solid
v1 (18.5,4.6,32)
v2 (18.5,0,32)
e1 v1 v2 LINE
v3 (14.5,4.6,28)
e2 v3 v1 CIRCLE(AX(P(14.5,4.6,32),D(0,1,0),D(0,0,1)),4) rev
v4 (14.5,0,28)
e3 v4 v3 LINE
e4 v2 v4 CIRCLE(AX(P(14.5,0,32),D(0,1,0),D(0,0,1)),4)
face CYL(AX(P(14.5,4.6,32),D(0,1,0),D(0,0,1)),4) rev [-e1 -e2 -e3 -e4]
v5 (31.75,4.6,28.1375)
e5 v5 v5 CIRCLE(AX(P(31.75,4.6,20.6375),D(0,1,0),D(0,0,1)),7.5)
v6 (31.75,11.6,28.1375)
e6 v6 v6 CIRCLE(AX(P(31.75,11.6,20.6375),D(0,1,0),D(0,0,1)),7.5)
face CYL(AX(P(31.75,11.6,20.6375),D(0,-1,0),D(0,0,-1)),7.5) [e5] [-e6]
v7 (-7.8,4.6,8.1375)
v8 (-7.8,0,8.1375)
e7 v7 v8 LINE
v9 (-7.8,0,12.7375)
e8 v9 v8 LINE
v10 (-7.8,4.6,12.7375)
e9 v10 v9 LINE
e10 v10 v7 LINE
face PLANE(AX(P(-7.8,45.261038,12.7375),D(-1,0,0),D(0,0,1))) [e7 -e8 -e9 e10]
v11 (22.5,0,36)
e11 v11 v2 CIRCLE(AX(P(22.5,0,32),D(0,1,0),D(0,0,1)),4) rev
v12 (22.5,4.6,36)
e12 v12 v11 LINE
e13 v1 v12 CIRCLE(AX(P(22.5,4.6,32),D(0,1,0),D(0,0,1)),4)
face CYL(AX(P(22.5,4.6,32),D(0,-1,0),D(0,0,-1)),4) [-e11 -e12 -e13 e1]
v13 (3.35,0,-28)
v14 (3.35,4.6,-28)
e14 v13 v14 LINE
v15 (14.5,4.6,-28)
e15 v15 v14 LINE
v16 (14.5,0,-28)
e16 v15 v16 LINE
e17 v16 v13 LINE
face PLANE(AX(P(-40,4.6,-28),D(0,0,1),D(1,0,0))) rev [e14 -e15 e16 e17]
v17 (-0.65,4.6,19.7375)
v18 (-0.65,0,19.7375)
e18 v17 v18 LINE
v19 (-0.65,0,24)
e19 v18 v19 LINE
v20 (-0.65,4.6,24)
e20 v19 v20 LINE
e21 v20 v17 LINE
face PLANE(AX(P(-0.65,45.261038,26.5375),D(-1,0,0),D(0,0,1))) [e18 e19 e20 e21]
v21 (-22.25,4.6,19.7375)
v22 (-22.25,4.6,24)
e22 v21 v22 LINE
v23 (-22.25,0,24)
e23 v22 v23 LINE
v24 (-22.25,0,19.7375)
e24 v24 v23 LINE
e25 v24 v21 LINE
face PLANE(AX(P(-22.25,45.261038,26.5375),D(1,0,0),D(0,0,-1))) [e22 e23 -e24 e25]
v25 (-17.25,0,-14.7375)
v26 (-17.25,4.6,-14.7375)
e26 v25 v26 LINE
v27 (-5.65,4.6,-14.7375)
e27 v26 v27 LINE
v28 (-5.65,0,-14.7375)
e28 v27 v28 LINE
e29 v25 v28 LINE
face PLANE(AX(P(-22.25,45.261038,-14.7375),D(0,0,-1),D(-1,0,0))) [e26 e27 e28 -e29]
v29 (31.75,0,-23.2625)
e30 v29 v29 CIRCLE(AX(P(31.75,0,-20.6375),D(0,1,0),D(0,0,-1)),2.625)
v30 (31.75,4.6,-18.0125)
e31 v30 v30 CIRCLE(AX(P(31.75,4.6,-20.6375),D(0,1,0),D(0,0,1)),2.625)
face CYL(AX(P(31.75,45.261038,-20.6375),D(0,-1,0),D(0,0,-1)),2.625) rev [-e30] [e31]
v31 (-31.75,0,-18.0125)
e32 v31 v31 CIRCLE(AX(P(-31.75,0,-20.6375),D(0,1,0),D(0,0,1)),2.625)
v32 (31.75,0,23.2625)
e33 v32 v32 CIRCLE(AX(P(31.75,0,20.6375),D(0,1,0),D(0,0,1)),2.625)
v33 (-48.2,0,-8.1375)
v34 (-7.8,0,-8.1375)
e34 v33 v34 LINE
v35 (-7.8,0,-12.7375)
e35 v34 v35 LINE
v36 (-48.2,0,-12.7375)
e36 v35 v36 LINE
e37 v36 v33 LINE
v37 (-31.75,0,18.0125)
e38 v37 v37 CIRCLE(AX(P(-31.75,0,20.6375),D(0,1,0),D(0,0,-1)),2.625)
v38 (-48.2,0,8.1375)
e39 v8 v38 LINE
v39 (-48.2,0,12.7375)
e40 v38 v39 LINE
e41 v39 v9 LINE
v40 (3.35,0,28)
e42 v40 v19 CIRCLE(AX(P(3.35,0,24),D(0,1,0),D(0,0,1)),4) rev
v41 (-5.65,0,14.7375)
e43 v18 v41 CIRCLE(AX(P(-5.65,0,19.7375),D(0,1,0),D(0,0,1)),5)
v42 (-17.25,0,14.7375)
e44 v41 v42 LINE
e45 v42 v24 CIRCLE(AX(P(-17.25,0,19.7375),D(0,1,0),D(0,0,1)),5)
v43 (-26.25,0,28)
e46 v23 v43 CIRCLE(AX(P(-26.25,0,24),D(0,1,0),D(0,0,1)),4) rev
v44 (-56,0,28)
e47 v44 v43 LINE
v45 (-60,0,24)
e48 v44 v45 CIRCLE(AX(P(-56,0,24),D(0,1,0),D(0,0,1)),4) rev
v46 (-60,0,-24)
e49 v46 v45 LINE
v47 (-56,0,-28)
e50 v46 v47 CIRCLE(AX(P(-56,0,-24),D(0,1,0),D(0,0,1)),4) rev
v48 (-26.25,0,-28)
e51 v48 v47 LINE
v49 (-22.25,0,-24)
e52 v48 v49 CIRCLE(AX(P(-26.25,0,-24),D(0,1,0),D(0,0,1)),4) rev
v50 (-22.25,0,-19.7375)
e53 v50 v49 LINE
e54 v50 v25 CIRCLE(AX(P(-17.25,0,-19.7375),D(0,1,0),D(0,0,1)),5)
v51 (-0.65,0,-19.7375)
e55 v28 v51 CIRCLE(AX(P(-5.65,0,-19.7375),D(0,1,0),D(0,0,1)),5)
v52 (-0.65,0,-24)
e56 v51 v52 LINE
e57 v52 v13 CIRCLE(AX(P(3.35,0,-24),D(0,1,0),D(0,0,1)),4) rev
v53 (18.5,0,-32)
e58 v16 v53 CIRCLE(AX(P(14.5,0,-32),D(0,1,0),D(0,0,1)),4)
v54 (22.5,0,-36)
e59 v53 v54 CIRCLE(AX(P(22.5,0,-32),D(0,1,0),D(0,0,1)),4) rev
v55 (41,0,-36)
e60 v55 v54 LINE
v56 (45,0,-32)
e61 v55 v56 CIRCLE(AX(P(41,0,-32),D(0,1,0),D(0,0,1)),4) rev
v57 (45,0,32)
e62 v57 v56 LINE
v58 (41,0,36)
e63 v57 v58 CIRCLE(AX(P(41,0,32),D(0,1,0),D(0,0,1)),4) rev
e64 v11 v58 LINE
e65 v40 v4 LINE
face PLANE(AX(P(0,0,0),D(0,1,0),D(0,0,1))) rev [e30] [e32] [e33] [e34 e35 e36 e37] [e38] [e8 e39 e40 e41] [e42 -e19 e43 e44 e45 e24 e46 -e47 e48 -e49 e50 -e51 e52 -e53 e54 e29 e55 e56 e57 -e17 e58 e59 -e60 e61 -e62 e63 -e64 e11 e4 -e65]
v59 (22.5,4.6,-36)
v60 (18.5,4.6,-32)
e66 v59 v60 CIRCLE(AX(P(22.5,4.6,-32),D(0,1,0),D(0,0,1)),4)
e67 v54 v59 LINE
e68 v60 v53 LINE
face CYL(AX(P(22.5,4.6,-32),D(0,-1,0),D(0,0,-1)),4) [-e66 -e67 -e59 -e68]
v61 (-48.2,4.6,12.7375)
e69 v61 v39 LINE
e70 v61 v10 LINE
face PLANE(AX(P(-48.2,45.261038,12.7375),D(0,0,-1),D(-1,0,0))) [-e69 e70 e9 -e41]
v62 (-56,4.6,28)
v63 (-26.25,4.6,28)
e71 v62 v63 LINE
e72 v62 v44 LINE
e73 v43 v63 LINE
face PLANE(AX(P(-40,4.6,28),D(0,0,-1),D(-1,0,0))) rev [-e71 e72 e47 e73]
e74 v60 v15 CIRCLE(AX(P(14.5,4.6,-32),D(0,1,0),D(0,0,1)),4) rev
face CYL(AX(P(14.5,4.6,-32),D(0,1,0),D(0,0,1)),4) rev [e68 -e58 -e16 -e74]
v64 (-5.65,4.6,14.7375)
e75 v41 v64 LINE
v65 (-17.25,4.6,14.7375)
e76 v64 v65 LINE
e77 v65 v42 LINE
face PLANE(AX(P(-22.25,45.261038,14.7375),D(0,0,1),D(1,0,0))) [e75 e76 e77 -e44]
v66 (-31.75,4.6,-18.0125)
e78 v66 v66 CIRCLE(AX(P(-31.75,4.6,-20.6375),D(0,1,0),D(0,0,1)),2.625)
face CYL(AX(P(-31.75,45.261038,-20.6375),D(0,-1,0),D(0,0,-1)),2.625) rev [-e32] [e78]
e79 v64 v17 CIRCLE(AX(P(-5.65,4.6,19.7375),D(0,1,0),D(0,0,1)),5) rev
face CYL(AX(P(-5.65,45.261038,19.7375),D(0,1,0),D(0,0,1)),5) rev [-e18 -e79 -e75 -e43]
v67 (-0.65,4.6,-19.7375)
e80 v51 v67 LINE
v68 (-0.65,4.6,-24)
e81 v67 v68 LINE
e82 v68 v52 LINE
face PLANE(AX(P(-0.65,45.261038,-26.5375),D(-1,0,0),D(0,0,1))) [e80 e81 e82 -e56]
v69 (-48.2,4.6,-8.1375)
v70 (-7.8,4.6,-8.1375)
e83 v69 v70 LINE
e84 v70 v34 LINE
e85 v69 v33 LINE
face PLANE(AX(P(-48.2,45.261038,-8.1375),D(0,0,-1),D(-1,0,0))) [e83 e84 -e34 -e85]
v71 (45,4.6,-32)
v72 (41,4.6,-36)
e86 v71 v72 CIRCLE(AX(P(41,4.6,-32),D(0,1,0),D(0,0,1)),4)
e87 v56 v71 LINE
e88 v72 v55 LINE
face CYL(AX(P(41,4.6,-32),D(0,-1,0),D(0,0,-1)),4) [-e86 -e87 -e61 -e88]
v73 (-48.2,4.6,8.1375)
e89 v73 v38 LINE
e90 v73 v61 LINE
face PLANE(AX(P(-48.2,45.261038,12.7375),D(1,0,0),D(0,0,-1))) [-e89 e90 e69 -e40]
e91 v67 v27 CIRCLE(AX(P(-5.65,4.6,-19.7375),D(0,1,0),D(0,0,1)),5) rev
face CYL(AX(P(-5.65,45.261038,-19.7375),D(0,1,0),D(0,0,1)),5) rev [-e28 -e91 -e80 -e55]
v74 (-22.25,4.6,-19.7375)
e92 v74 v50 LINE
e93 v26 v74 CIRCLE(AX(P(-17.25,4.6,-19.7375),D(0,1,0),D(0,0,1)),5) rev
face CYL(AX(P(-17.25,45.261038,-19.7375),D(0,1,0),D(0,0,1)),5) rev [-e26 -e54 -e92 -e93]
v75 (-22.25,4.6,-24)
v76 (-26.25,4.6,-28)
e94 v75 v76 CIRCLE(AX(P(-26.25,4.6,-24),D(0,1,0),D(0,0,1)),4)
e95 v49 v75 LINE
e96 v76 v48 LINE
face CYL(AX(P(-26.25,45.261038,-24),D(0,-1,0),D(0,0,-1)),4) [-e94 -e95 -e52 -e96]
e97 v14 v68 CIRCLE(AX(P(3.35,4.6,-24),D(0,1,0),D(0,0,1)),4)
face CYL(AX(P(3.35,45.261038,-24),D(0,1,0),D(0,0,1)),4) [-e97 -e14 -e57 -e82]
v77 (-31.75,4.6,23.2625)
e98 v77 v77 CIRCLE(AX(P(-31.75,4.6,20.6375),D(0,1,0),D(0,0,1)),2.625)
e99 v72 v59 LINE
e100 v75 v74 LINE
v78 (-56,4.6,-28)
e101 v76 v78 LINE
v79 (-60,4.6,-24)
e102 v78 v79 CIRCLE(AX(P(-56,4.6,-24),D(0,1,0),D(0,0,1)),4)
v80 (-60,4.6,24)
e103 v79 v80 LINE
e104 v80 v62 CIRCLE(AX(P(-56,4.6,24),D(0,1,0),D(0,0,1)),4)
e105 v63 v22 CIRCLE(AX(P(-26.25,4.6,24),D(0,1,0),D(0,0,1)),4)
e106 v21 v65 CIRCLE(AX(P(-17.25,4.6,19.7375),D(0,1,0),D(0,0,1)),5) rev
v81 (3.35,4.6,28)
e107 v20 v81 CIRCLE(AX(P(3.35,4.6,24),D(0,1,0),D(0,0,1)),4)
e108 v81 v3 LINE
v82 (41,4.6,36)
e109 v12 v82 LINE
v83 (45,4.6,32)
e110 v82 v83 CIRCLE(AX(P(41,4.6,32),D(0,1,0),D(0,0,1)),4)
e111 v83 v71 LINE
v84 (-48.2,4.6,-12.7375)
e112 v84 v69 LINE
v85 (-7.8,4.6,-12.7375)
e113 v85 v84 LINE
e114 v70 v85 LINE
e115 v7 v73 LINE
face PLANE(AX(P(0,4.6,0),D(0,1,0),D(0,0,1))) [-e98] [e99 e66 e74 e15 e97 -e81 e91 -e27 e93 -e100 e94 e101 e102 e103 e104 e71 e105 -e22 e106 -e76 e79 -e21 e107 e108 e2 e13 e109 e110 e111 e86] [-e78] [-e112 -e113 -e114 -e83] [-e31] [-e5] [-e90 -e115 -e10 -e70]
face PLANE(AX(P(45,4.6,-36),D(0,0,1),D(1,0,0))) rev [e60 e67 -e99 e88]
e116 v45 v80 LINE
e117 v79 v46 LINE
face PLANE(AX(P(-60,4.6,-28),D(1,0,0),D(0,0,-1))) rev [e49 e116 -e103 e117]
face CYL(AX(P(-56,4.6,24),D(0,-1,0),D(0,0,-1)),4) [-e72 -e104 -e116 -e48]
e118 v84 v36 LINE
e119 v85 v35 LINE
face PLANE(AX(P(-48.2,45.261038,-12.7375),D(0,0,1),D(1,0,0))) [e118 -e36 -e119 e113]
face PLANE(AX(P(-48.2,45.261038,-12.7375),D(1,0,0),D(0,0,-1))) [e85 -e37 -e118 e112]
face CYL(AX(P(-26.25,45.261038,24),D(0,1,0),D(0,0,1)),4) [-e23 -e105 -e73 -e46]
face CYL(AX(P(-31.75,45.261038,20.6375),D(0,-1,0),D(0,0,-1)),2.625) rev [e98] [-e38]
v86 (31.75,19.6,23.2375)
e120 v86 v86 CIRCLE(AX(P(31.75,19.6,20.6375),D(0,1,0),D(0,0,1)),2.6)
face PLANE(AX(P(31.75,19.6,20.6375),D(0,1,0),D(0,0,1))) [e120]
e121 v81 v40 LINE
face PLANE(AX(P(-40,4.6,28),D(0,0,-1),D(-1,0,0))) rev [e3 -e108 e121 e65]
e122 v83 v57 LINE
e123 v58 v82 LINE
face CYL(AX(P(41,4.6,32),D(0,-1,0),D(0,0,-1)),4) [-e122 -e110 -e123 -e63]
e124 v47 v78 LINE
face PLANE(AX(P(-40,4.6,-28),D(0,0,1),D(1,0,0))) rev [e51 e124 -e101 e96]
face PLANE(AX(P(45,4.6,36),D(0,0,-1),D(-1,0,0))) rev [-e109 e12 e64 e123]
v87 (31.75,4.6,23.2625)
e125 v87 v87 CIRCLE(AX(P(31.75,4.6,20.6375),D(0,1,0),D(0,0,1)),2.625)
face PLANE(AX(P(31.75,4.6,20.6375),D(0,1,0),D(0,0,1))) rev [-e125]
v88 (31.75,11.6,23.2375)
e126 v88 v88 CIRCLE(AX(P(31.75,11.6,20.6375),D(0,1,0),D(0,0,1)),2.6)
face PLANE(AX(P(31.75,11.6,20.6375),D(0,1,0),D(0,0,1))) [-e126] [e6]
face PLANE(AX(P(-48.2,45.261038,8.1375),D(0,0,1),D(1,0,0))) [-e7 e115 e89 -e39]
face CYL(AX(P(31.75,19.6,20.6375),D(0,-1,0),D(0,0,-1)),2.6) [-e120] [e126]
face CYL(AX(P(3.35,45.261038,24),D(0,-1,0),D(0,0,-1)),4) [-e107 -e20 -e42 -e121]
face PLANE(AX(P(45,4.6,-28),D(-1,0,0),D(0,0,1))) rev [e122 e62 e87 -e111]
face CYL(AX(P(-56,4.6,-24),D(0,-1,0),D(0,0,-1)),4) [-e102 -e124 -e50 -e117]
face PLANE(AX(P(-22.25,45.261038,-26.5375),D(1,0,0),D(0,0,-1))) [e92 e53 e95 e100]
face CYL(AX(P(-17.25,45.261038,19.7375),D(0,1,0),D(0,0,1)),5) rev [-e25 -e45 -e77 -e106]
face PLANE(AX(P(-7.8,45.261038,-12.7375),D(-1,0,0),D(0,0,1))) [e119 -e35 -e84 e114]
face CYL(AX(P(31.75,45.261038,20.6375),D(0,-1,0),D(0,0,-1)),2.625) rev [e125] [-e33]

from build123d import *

# Parameters (mm, degrees)
EXTRUDE_1_DEPTH     = 4.6
SKETCH_1_R          = 2.625
SKETCH_1_W          = 40.4
SKETCH_1_H          = 4.6
CUT_EXTRUDE_1_DEPTH = 4.6
SKETCH_5_R          = 7.5
EXTRUDE_2_DEPTH     = 7
SKETCH_6_R          = 2.6
EXTRUDE_3_DEPTH     = 8
FILLET_1_R          = 5
FILLET_2_R          = 4


with BuildPart() as part:
    # 草图3 → 凸台-拉伸1 (new body)
    with BuildSketch(Plane(origin=(0, 0, 0), x_dir=(1, 0, 0), z_dir=(0, 1, 0))):
        Polygon((-40, 28), (-60, 28), (-60, -28), (-40, -28), (18.5, -28), (18.5, -36), (45, -36), (45, -28), (45, 28), (45, 36), (18.5, 36), (18.5, 28), align=None)
    extrude(amount=EXTRUDE_1_DEPTH)

    # 草图1 → 切除-拉伸1 (cut)
    with BuildSketch(Plane(origin=(0, 0, 0), x_dir=(1, 0, 0), z_dir=(0, 1, 0))):
        with Locations(Location((-31.75, 20.6375, 0), (0, 0, 270))):
            Circle(SKETCH_1_R)
        with Locations(Location((31.75, 20.6375, 0), (0, 0, 90))):
            Circle(SKETCH_1_R)
        with Locations(Location((31.75, -20.6375, 0), (0, 0, 270))):
            Circle(SKETCH_1_R)
        with Locations(Location((-31.75, -20.6375, 0), (0, 0, 90))):
            Circle(SKETCH_1_R)
        with Locations((-28, -10.4375)):
            Rectangle(SKETCH_1_W, SKETCH_1_H)
        with Locations((-28, 10.4375)):
            Rectangle(SKETCH_1_W, SKETCH_1_H)
        Polygon((-22.25, -26.5375), (-22.25, -14.7375), (-0.65, -14.7375), (-0.65, -26.5375), (-0.65, -30.009482824), (-22.25, -30.009482824), align=None)
        Polygon((-22.25, 14.7375), (-0.65, 14.7375), (-0.65, 26.5375), (-0.65, 30.009482824), (-22.25, 30.009482824), (-22.25, 26.5375), align=None)
    extrude(amount=CUT_EXTRUDE_1_DEPTH, mode=Mode.SUBTRACT)

    # 草图5 → 凸台-拉伸2 (add)
    with BuildSketch(Plane(origin=(0, 4.6, 0), x_dir=(1, 0, 0), z_dir=(0, 1, 0))):
        with Locations(Location((31.75, -20.6375, 0), (0, 0, 270))):
            Circle(SKETCH_5_R)
    extrude(amount=EXTRUDE_2_DEPTH)

    # 草图6 → 凸台-拉伸3 (add)
    with BuildSketch(Plane(origin=(0, 11.6, 0), x_dir=(1, 0, 0), z_dir=(0, 1, 0))):
        with Locations(Location((31.75, -20.6375, 0), (0, 0, 270))):
            Circle(SKETCH_6_R)
    extrude(amount=EXTRUDE_3_DEPTH)

    # 圆角1
    fillet_1_edges = [part.edges().sort_by_distance(p)[0] for p in [
        (-22.25, 2.3, 14.7375),
        (-0.65, 2.3, 14.7375),
        (-0.65, 2.3, -14.7375),
        (-22.25, 2.3, -14.7375),
    ]]
    fillet(fillet_1_edges, radius=FILLET_1_R)

    # 圆角2
    fillet_2_edges = [part.edges().sort_by_distance(p)[0] for p in [
        (-0.65, 2.3, 28),
        (-22.25, 2.3, 28),
        (-0.65, 2.3, -28),
        (-22.25, 2.3, -28),
        (-60, 2.3, 28),
        (-60, 2.3, -28),
        (18.5, 2.3, -28),
        (18.5, 2.3, -36),
        (45, 2.3, -36),
        (45, 2.3, 36),
        (18.5, 2.3, 36),
        (18.5, 2.3, 28),
    ]]
    fillet(fillet_2_edges, radius=FILLET_2_R - 0.0001)  # a hair under: the kernel refuses the full size


solid = part.part
